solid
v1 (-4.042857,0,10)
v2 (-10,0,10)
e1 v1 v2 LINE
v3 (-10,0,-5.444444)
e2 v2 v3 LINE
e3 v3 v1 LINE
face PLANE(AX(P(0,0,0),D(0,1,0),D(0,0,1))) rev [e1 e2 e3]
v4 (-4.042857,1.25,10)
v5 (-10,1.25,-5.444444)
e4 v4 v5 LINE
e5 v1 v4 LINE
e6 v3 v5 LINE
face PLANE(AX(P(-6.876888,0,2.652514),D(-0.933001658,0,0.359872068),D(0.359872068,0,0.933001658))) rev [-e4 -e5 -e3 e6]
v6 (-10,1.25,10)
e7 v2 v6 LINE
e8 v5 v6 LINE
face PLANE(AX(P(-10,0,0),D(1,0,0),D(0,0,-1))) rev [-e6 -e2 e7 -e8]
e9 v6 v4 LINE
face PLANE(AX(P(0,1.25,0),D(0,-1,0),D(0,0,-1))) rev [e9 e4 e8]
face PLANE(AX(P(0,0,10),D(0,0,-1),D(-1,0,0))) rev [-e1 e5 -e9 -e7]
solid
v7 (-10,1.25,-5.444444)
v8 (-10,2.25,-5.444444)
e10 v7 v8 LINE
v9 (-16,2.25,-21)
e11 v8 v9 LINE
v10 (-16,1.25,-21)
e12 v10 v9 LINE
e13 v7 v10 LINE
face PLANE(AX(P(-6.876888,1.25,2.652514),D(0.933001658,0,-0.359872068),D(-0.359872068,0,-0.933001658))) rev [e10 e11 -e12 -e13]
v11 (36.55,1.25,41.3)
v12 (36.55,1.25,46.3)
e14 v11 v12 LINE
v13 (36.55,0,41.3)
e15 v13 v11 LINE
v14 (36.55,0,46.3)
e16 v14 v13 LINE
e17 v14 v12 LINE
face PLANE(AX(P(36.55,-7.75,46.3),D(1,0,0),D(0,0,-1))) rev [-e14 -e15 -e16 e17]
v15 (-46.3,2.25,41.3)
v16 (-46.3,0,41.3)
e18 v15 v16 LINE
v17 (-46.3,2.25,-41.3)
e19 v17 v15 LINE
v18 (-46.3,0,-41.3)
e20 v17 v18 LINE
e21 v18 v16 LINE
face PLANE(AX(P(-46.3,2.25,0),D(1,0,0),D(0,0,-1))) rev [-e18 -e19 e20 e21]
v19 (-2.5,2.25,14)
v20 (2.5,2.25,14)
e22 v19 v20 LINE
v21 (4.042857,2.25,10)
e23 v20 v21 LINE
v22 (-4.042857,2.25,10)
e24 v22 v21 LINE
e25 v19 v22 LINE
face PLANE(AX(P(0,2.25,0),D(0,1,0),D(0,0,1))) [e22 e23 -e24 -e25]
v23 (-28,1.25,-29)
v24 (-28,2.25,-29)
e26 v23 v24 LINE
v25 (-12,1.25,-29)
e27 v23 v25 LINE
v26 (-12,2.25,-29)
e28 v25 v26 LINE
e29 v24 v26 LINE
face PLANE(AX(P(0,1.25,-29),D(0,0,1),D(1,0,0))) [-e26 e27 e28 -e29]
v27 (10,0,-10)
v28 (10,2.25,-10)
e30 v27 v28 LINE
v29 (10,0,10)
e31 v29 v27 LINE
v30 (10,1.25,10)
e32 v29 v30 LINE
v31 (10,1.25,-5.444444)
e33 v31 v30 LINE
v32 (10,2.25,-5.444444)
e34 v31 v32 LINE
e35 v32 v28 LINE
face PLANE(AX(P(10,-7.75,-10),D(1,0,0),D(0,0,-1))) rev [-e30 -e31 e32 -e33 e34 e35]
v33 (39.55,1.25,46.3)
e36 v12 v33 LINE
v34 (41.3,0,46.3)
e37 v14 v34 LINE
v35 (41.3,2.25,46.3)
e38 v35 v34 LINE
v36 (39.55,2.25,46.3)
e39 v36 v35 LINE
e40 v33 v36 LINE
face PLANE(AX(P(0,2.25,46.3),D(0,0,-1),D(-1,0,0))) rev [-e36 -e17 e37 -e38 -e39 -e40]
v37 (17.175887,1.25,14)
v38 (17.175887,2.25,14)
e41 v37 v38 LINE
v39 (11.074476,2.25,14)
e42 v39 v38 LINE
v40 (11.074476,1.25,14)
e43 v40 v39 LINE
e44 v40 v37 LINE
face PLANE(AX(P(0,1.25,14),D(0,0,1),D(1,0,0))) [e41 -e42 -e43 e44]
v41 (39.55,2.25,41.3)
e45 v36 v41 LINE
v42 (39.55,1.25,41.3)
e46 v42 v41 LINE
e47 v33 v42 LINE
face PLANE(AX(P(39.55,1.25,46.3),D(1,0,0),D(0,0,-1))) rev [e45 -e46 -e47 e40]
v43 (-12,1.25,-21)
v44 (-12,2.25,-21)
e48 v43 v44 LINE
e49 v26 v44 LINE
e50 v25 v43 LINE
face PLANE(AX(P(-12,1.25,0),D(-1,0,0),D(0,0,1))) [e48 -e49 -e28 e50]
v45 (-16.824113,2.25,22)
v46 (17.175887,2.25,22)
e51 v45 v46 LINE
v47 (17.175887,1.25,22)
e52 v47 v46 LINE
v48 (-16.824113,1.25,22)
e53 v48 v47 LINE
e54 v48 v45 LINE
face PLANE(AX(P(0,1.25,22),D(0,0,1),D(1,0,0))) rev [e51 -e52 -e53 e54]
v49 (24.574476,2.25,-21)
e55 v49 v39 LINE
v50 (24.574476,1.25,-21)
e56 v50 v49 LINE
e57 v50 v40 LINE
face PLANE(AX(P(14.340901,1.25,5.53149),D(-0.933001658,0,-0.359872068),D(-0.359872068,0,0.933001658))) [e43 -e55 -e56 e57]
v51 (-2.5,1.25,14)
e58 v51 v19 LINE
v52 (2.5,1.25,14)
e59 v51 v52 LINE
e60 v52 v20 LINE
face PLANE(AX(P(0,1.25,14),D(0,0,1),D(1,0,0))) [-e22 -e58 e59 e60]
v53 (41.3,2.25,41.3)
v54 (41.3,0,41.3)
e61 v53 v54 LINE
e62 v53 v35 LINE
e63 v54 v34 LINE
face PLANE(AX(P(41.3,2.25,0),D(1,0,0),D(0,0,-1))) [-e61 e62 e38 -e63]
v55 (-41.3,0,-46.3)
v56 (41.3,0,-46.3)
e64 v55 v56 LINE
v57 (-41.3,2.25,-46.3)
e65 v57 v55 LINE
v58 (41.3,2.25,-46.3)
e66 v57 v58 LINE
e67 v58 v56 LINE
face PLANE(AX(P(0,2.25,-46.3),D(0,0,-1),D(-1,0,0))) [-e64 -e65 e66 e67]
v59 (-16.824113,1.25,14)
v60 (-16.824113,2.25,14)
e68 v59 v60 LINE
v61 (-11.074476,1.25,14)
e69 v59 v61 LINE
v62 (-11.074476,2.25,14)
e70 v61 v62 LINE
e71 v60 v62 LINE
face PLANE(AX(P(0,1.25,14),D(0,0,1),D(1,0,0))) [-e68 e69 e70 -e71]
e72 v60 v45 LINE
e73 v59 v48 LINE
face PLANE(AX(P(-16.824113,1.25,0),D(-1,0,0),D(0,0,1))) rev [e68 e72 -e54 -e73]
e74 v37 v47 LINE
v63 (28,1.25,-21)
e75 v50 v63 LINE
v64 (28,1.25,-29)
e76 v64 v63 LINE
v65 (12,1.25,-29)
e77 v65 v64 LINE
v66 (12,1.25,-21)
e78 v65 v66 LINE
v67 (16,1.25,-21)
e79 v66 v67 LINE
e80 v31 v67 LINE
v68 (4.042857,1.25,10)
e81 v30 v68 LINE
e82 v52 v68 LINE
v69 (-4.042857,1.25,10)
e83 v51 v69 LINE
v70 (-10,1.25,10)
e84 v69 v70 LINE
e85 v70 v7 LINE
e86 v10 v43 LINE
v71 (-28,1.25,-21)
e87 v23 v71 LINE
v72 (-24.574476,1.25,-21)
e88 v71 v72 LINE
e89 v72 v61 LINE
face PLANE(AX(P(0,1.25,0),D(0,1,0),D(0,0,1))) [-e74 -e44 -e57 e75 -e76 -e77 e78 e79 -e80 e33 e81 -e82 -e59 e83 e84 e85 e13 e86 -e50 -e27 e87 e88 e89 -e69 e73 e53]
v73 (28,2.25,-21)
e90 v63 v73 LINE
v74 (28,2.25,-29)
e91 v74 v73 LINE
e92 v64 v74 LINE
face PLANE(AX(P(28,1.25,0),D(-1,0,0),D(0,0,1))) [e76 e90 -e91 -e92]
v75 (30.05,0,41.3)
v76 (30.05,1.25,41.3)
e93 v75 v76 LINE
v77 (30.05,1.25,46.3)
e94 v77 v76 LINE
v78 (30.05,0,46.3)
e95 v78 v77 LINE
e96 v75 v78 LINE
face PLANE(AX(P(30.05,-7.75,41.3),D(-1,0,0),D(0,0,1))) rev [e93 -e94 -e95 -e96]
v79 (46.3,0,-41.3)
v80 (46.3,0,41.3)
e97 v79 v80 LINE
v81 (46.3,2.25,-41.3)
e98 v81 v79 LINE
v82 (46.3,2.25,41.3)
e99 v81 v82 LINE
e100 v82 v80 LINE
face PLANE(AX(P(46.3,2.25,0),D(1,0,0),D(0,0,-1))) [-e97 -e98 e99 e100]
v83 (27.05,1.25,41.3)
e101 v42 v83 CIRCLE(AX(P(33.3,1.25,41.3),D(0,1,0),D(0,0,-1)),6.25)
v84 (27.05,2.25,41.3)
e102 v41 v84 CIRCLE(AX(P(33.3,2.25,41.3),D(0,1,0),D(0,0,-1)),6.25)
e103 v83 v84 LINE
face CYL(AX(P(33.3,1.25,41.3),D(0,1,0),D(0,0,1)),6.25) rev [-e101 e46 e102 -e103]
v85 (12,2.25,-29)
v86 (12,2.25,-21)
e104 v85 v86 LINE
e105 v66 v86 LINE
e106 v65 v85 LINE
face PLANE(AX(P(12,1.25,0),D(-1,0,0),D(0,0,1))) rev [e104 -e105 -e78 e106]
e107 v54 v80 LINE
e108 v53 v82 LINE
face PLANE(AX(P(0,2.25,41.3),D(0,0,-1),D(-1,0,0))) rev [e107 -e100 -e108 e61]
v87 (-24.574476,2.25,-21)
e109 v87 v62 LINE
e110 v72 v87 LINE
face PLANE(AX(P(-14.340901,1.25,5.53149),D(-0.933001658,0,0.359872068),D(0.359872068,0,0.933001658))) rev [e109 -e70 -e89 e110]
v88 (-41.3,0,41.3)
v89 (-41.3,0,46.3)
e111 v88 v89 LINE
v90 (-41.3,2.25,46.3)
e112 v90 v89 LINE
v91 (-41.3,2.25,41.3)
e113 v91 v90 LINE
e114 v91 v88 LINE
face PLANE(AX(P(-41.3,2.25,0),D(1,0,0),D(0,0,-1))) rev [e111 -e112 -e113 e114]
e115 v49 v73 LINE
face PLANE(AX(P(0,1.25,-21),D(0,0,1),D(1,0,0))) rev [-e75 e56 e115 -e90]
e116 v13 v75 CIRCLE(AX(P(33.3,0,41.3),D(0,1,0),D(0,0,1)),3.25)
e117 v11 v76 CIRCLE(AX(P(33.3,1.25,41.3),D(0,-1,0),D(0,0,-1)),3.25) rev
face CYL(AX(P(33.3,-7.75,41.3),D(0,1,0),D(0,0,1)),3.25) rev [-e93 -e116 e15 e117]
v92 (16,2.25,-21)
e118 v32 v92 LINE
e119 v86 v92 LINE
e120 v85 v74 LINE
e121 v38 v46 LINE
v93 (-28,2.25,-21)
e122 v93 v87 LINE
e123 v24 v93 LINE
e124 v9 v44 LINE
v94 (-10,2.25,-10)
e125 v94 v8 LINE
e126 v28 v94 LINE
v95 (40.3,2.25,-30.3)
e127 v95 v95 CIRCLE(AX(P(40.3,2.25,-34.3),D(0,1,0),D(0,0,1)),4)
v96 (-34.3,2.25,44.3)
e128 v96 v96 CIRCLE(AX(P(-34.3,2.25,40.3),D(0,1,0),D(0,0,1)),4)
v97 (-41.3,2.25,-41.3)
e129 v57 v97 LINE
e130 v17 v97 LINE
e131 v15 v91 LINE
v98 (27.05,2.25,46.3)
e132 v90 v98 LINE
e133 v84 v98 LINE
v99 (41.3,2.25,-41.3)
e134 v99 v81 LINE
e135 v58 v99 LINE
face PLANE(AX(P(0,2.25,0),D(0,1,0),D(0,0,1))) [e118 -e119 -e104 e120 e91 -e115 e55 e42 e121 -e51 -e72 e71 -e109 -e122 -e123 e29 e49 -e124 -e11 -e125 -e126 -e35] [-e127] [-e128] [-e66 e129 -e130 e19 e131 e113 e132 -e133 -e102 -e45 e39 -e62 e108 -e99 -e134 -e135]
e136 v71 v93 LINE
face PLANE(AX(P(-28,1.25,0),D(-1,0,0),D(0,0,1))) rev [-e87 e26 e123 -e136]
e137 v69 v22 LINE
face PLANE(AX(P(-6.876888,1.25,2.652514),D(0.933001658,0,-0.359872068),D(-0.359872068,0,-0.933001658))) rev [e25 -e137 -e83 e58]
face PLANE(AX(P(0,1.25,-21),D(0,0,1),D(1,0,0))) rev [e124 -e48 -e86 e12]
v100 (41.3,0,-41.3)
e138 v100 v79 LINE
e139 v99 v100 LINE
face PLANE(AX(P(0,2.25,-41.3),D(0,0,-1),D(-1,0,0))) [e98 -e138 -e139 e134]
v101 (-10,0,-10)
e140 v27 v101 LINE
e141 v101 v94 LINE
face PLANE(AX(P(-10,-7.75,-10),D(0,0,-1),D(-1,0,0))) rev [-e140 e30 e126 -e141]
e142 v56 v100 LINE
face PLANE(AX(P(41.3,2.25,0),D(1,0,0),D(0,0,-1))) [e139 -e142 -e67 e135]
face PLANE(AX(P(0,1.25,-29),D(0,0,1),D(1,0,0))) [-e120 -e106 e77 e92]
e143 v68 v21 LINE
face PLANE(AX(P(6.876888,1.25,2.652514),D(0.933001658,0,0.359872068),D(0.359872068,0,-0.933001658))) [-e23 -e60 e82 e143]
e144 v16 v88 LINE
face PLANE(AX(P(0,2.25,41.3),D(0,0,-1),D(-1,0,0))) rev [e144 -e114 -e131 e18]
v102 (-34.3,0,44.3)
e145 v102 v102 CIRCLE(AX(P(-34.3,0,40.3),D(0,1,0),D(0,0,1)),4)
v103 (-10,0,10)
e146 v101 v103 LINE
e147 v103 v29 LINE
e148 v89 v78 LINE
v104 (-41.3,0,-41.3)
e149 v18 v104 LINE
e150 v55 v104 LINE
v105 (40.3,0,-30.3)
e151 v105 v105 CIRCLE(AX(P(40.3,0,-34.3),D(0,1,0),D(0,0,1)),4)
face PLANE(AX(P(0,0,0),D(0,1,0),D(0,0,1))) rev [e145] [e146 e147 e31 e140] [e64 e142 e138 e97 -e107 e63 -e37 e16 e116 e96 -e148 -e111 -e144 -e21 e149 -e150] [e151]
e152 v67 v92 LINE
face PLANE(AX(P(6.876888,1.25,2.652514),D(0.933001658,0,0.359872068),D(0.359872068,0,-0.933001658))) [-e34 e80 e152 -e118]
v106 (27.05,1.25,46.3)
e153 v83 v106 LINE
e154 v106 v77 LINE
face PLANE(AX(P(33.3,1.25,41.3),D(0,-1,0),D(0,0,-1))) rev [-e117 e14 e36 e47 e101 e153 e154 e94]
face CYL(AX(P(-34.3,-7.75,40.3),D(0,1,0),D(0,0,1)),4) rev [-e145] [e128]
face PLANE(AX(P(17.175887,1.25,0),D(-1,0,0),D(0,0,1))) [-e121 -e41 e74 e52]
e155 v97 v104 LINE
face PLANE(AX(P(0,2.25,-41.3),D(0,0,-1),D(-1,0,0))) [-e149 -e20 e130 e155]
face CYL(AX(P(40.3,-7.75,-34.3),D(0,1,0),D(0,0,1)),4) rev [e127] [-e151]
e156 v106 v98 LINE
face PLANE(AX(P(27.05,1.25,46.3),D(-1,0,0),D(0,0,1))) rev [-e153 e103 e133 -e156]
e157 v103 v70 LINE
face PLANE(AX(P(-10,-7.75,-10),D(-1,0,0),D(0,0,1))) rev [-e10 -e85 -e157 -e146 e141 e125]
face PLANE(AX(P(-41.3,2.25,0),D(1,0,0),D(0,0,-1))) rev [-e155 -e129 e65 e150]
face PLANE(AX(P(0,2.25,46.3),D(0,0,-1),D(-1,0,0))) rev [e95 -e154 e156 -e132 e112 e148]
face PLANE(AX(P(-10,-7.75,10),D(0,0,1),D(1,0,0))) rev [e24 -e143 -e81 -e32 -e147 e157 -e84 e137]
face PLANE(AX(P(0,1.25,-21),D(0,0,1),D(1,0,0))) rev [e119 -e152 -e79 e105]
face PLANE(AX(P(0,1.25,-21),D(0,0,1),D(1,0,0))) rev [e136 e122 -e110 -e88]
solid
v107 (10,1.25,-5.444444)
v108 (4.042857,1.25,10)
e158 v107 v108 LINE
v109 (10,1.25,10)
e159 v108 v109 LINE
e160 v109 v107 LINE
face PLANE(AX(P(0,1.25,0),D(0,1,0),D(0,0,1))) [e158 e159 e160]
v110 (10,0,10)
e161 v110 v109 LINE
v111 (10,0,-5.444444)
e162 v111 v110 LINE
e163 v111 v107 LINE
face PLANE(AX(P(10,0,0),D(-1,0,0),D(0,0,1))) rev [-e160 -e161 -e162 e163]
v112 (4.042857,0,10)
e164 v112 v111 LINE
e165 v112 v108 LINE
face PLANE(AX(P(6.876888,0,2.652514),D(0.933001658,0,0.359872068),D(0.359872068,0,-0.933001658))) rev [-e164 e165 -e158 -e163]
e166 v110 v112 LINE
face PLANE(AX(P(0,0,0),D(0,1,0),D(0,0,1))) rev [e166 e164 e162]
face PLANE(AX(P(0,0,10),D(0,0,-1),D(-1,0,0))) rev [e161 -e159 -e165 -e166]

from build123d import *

# Parameters (mm, degrees)
BOSS_EXTRUDE1_DEPTH   = 2.25
SKETCH3_R             = 4
CUT_EXTRUDE1_DEPTH    = 10
CUT_EXTRUDE3_DEPTH    = 10
CUT_EXTRUDE4_DEPTH    = 1
SKETCH7_W             = 20
SKETCH7_H             = 20
CUT_EXTRUDE5_DEPTH    = 10
CUT_EXTRUDE7_DEPTH    = 1
BOSS_EXTRUDE3_DEPTH   = 2.25
BOSS_EXTRUDE3_2_DEPTH = 2.25
CUT_EXTRUDE8_DEPTH    = 1


with BuildPart() as part:
    # Sketch2 → Boss-Extrude1 (new body)
    with BuildSketch(Plane(origin=(0, 0, 0), x_dir=(1, 0, 0), z_dir=(0, 1, 0))):
        Polygon((-41.3, 41.3), (-46.3, 41.3), (-46.3, -41.3), (-41.3, -41.3), (-41.3, -46.3), (41.3, -46.3), (41.3, -41.3), (46.3, -41.3), (46.3, 41.3), (41.3, 41.3), (41.3, 46.3), (-41.3, 46.3), align=None)
    extrude(amount=BOSS_EXTRUDE1_DEPTH)

    # Sketch3 → Cut-Extrude1 (cut)
    with BuildSketch(Plane(origin=(0, 2.25, 0), x_dir=(1, 0, 0), z_dir=(0, 1, 0))):
        with Locations((-34.3, -40.3)):
            Circle(SKETCH3_R)
        with Locations((40.3, 34.3)):
            Circle(SKETCH3_R)
    extrude(amount=-CUT_EXTRUDE1_DEPTH, mode=Mode.SUBTRACT)

    # Sketch5 → Cut-Extrude3 (cut)
    with BuildSketch(Plane(origin=(0, 2.25, 0), x_dir=(1, 0, 0), z_dir=(0, 1, 0))):
        with BuildLine():
            Line((30.05, -41.3), (30.05, -46.3))
            Line((30.05, -46.3), (36.55, -46.3))
            Line((36.55, -46.3), (36.55, -41.3))
            ThreePointArc((36.55, -41.3), (33.3, -38.05), (30.05, -41.3))
        make_face()
    extrude(amount=-CUT_EXTRUDE3_DEPTH, mode=Mode.SUBTRACT)

    # Sketch6 → Cut-Extrude4 (cut)
    with BuildSketch(Plane(origin=(0, 2.25, 0), x_dir=(1, 0, 0), z_dir=(0, 1, 0))):
        with BuildLine():
            Line((27.05, -46.3), (27.05, -41.3))
            ThreePointArc((27.05, -41.3), (33.3, -35.05), (39.55, -41.3))
            Line((39.55, -41.3), (39.55, -46.3))
            Line((39.55, -46.3), (36.55, -46.3))
            Line((36.55, -46.3), (36.55, -41.3))
            Line((36.55, -41.3), (30.05, -41.3))
            Line((30.05, -41.3), (30.05, -46.3))
            Line((30.05, -46.3), (27.05, -46.3))
        make_face()
    extrude(amount=-CUT_EXTRUDE4_DEPTH, mode=Mode.SUBTRACT)

    # Sketch7 → Cut-Extrude5 (cut)
    with BuildSketch(Plane(origin=(0, 2.25, 0), x_dir=(1, 0, 0), z_dir=(0, 1, 0))):
        Rectangle(SKETCH7_W, SKETCH7_H)
    extrude(amount=-CUT_EXTRUDE5_DEPTH, mode=Mode.SUBTRACT)

    # Sketch18 → Cut-Extrude7 (cut)
    with BuildSketch(Plane(origin=(0, 2.25, 0), x_dir=(1, 0, 0), z_dir=(0, 1, 0))):
        Polygon((-2.5, -14), (-16, 21), (-12, 21), (-12, 29), (-28, 29), (-28, 21), (-24.574475649, 21), (-11.074475649, -14), (-16.824113427, -14), (-16.824113427, -22), (17.175886573, -22), (17.175886573, -14), (11.074475649, -14), (24.574475649, 21), (28, 21), (28, 29), (12, 29), (12, 21), (16, 21), (2.5, -14), align=None)
    extrude(amount=-CUT_EXTRUDE7_DEPTH, mode=Mode.SUBTRACT)


with BuildPart() as body_2:
    # Sketch19 → Boss-Extrude3 (new body)
    with BuildSketch(Plane(origin=(0, 2.25, 0), x_dir=(1, 0, 0), z_dir=(0, 1, 0))):
        Polygon((10, 5.444444444), (4.042857143, -10), (10, -10), align=None)
    extrude(amount=-BOSS_EXTRUDE3_DEPTH)


with BuildPart() as body_3:
    # Sketch19 → Boss-Extrude3 2 (new body)
    with BuildSketch(Plane(origin=(0, 2.25, 0), x_dir=(1, 0, 0), z_dir=(0, 1, 0))):
        Polygon((-4.042857143, -10), (-10, 5.444444444), (-10, -10), align=None)
    extrude(amount=-BOSS_EXTRUDE3_2_DEPTH)


with BuildPart() as cut_extrude8_tool:
    # Sketch20 → Cut-Extrude8 (new body)
    with BuildSketch(Plane(origin=(0, 2.25, 0), x_dir=(1, 0, 0), z_dir=(0, 1, 0))):
        Polygon((-10, 5.444444444), (-10, -10), (-4.042857143, -10), align=None)
        Polygon((4.042857143, -10), (10, 5.444444444), (10, -10), align=None)
    extrude(amount=-CUT_EXTRUDE8_DEPTH)


with BuildPart() as body_2_1:
    add(body_2.part)

    # Cut-Extrude8: cut by cut_extrude8_tool
    add(cut_extrude8_tool.part, mode=Mode.SUBTRACT)


with BuildPart() as body_3_1:
    add(body_3.part)

    # Cut-Extrude8: cut by cut_extrude8_tool
    add(cut_extrude8_tool.part, mode=Mode.SUBTRACT)


solid = Compound([part.part, body_2_1.part, body_3_1.part])
